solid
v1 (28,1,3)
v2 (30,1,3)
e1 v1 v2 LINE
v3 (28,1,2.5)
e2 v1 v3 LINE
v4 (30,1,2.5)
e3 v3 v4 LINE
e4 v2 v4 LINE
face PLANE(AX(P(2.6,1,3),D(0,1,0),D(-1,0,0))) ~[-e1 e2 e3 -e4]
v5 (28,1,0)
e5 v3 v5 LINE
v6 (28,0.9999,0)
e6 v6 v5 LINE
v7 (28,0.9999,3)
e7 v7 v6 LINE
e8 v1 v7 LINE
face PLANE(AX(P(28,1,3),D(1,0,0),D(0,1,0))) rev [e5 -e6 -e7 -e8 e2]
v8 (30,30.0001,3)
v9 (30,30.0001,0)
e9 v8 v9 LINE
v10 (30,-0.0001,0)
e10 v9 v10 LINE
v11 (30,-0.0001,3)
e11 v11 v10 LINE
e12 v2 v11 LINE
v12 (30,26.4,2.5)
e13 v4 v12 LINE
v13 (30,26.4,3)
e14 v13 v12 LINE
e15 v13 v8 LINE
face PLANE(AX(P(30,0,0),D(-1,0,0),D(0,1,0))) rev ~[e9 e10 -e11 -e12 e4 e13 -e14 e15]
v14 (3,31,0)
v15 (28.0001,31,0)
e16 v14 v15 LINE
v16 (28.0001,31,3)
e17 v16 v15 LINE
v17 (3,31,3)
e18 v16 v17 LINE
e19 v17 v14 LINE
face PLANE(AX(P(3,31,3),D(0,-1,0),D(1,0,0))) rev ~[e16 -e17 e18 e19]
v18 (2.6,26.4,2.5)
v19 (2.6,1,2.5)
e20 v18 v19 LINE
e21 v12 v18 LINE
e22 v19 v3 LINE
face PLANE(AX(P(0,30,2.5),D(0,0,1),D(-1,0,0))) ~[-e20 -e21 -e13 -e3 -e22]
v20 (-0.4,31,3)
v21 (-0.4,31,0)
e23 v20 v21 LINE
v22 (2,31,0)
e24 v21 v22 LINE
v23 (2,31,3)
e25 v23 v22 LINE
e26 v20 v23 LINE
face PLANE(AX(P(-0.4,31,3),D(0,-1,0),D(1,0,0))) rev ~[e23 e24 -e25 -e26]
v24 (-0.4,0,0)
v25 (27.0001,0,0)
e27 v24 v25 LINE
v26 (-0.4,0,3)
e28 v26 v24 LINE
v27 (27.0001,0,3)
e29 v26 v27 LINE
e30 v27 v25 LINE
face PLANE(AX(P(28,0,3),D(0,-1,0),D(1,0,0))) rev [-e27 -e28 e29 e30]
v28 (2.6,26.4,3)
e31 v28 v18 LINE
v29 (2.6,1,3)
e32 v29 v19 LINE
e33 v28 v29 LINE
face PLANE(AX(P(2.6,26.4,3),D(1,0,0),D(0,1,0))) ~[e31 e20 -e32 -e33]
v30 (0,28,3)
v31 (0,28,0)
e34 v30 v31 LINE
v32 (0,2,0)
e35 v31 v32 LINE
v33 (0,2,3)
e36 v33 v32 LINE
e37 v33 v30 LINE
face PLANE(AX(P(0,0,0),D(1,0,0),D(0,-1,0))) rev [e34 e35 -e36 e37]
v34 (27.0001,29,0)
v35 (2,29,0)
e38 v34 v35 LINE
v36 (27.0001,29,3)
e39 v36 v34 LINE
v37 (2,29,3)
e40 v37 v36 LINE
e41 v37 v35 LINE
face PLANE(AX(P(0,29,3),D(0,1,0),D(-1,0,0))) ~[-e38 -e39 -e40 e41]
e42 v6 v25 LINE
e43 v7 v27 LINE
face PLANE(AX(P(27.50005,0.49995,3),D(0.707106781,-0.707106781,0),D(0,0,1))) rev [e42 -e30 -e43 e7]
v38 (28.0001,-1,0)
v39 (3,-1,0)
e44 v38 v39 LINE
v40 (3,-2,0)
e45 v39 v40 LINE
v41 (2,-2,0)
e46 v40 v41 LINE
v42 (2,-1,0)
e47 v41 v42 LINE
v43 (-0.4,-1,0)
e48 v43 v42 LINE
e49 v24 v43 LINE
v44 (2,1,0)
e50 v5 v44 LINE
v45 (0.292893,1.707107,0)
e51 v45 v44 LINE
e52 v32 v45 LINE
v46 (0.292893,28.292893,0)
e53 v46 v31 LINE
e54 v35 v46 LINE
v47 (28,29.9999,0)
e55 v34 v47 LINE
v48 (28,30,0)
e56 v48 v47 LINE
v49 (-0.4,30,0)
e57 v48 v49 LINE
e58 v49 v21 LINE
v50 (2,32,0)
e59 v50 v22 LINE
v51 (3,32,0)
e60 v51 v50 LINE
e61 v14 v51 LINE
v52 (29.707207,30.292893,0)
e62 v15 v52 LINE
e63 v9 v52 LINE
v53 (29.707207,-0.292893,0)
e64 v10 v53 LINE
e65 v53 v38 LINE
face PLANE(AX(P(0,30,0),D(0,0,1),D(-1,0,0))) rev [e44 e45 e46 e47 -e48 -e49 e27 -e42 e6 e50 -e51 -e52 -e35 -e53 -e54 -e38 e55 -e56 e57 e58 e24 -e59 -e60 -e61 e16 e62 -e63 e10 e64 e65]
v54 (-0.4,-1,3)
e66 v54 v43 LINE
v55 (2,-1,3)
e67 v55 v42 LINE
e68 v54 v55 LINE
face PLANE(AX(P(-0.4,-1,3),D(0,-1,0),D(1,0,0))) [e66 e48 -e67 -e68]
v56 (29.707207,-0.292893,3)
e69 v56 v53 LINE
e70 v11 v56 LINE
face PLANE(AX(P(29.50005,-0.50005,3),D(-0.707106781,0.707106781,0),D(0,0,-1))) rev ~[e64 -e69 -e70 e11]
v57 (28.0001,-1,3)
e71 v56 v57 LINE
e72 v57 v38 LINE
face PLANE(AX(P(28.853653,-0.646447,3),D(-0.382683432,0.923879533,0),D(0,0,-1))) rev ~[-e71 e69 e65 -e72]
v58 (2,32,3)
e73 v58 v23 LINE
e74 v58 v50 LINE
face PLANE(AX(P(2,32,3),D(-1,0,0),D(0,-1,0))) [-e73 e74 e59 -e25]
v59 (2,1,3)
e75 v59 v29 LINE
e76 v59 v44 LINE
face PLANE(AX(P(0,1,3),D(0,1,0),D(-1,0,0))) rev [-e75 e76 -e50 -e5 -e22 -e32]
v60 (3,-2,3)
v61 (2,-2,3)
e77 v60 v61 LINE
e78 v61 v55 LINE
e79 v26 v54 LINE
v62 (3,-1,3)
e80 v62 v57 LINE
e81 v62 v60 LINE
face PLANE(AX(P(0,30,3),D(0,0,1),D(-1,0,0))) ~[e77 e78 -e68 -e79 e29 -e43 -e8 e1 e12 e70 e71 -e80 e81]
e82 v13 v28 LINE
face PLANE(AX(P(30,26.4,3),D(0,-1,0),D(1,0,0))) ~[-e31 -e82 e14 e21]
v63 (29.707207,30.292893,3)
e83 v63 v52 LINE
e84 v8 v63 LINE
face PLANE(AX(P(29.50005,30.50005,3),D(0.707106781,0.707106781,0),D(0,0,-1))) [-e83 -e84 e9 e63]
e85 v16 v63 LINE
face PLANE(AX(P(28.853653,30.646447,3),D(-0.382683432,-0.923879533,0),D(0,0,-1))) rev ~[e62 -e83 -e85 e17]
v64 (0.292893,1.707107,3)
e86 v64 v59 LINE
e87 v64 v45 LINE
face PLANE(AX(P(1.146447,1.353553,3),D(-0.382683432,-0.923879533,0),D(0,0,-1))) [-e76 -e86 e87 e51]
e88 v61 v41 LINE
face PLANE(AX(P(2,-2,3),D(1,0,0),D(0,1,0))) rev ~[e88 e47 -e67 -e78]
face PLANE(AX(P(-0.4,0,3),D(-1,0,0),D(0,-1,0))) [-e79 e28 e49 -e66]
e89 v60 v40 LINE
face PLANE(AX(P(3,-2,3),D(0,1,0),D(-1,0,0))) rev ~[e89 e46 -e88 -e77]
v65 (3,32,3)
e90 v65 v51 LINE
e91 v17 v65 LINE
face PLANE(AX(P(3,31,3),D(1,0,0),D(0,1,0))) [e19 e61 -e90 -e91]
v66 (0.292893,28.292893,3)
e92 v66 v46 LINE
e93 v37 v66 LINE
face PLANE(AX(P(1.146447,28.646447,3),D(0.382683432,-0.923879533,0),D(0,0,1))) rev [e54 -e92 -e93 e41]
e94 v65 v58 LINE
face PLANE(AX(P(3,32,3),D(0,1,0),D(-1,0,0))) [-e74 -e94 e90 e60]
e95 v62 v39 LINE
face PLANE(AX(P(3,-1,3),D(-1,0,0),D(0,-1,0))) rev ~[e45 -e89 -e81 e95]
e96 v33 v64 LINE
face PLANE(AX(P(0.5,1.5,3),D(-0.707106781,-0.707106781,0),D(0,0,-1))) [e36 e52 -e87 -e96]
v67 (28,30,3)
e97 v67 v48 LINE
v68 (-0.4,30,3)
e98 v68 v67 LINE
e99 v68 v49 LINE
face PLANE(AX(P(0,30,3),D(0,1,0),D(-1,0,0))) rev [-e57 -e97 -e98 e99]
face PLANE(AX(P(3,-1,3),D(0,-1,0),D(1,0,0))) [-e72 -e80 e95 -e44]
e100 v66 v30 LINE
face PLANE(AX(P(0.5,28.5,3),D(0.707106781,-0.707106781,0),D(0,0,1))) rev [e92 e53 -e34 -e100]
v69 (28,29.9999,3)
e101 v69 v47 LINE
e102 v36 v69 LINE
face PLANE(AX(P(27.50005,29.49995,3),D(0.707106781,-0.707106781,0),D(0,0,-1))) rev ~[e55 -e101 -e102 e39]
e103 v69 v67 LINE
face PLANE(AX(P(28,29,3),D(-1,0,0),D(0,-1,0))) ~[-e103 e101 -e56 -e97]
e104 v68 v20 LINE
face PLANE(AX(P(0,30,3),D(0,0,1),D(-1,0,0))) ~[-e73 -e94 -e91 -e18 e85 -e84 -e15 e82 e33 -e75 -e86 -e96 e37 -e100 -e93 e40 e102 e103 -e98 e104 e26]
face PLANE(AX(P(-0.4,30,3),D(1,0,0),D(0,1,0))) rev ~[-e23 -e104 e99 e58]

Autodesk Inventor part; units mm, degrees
ref_plane "YZ Plane" through (0, 0, 0) normal (1, 0, 0) x (0, 1, 0)
ref_plane "XZ Plane" through (0, 0, 0) normal (0, 1, 0) x (-1, 0, 0)
sketch "Sketch1" plane through (0, 0, 0) normal (0, 0, 1) x (1, 0, 0)
  line L0 (0, 0) -> (30, 0)
  line L1 (30, 0) -> (30, 30)
  line L2 (30, 30) -> (0, 30)
  line L3 (0, 30) -> (0, 0)
  dimension "d0" = 30
  dimension "d1" = 30
extrude "Extrusion1" add sketch "Sketch1" along normal blind 3
sketch "Sketch2" plane through (0, 0, 3) normal (0, 0, 1) x (1, 0, 0)
  line L0 (30, 3.6) -> (2.6, 3.6)
  line L1 (2.6, 3.6) -> (2.6, 29)
  line L2 (2.6, 29) -> (30, 29)
  line L3 (30, 29) -> (30, 3.6)
  line L4 (0, 0) -> (30, 0) projected
  line L5 (30, 0) -> (30, 30) projected
  dimension "d4" = 27.4
  dimension "d5" = 25.4
  dimension "d36" = 3.6
extrude "Extrusion2" cut sketch "Sketch2" against normal blind 0.5
sketch "Sketch3" plane through (0, 0, 3) normal (0, 0, 1) x (1, 0, 0)
  line L0 (30, 30) -> (0, 30) projected
  line L1 (0, 30) -> (0, 0) projected
  line L2 (28, 30) -> (0, 30)
  line L3 (0, 30) -> (0, 29)
  line L4 (0, 29) -> (28, 29)
  line L5 (28, 29) -> (28, 30)
  line L6 (30, 29) -> (30, 30) projected
  line L7 (0, 0) -> (30, 0) projected
  line L8 (28, 0) -> (0, 0)
  line L9 (0, 0) -> (0, 1)
  line L10 (0, 1) -> (28, 1)
  line L11 (28, 1) -> (28, 0)
  line L12 (30, 0) -> (30, 3.6) projected
  dimension "d8" = 1
  dimension "d9" = 2
  dimension "d10" = 1
  dimension "d11" = 2
extrude "Extrusion3" cut sketch "Sketch3" against normal through all
sketch "Sketch4" plane through (0, 0, 3) normal (0, 0, 1) x (1, 0, 0)
  line L0 (30, 29) -> (30, 30) projected
  line L1 (30, 30) -> (-0.4, 30)
  line L2 (-0.4, 30) -> (-0.4, 31)
  line L3 (-0.4, 31) -> (30, 31)
  line L4 (30, 31) -> (30, 30)
  line L5 (30, 0) -> (-0.4, 0)
  line L6 (-0.4, 0) -> (-0.4, -1)
  line L7 (-0.4, -1) -> (30, -1)
  line L8 (30, -1) -> (30, 0)
  line L9 (2, 31) -> (3, 31)
  line L10 (3, 31) -> (3, 32)
  line L11 (3, 32) -> (2, 32)
  line L12 (2, 32) -> (2, 31)
  line L13 (2, -1) -> (3, -1)
  line L14 (3, -1) -> (3, -2)
  line L15 (3, -2) -> (2, -2)
  line L16 (2, -2) -> (2, -1)
  line L17 (0, 29) -> (0, 1) projected
  point P0 (0, 0)
  dimension "d14" = 30.4
  dimension "d15" = 1
  dimension "d17" = 1
  dimension "d20" = 1
  dimension "d21" = 1
  dimension "d26" = 1
  dimension "d27" = 1
  dimension "d35" = 2
extrude "Extrusion4" add sketch "Sketch4" against normal blind 3
chamfer "Chamfer1" distance 1 angle 45 4 edges at (30, 31, 1.5) (30, -1, 1.5) (28, 1, 1.5) (28, 30, 1.5)
chamfer "Chamfer2" distance 1 angle 45 2 edges at (29.0001, 31, 1.5) (29.0001, -1, 1.5)
ref_plane "Work Plane1" through (2, 15, 3) normal (0, -1, 0) x (1, 0, 0)
mirror "Mirror1" about plane through (2, 15, 3) normal (0, -1, 0) of "Extrusion1", "Extrusion2", "Extrusion3", "Extrusion4", "Chamfer1", "Chamfer2"
chamfer "Chamfer3" distance 1 angle 45 2 edges at (0, 29, 1.5) (0, 1, 1.5)
chamfer "Chamfer4" distance 1 angle 45 2 edges at (1, 29, 1.5) (1, 1, 1.5)
properties part number "TA10" material "ABS Plastic"
